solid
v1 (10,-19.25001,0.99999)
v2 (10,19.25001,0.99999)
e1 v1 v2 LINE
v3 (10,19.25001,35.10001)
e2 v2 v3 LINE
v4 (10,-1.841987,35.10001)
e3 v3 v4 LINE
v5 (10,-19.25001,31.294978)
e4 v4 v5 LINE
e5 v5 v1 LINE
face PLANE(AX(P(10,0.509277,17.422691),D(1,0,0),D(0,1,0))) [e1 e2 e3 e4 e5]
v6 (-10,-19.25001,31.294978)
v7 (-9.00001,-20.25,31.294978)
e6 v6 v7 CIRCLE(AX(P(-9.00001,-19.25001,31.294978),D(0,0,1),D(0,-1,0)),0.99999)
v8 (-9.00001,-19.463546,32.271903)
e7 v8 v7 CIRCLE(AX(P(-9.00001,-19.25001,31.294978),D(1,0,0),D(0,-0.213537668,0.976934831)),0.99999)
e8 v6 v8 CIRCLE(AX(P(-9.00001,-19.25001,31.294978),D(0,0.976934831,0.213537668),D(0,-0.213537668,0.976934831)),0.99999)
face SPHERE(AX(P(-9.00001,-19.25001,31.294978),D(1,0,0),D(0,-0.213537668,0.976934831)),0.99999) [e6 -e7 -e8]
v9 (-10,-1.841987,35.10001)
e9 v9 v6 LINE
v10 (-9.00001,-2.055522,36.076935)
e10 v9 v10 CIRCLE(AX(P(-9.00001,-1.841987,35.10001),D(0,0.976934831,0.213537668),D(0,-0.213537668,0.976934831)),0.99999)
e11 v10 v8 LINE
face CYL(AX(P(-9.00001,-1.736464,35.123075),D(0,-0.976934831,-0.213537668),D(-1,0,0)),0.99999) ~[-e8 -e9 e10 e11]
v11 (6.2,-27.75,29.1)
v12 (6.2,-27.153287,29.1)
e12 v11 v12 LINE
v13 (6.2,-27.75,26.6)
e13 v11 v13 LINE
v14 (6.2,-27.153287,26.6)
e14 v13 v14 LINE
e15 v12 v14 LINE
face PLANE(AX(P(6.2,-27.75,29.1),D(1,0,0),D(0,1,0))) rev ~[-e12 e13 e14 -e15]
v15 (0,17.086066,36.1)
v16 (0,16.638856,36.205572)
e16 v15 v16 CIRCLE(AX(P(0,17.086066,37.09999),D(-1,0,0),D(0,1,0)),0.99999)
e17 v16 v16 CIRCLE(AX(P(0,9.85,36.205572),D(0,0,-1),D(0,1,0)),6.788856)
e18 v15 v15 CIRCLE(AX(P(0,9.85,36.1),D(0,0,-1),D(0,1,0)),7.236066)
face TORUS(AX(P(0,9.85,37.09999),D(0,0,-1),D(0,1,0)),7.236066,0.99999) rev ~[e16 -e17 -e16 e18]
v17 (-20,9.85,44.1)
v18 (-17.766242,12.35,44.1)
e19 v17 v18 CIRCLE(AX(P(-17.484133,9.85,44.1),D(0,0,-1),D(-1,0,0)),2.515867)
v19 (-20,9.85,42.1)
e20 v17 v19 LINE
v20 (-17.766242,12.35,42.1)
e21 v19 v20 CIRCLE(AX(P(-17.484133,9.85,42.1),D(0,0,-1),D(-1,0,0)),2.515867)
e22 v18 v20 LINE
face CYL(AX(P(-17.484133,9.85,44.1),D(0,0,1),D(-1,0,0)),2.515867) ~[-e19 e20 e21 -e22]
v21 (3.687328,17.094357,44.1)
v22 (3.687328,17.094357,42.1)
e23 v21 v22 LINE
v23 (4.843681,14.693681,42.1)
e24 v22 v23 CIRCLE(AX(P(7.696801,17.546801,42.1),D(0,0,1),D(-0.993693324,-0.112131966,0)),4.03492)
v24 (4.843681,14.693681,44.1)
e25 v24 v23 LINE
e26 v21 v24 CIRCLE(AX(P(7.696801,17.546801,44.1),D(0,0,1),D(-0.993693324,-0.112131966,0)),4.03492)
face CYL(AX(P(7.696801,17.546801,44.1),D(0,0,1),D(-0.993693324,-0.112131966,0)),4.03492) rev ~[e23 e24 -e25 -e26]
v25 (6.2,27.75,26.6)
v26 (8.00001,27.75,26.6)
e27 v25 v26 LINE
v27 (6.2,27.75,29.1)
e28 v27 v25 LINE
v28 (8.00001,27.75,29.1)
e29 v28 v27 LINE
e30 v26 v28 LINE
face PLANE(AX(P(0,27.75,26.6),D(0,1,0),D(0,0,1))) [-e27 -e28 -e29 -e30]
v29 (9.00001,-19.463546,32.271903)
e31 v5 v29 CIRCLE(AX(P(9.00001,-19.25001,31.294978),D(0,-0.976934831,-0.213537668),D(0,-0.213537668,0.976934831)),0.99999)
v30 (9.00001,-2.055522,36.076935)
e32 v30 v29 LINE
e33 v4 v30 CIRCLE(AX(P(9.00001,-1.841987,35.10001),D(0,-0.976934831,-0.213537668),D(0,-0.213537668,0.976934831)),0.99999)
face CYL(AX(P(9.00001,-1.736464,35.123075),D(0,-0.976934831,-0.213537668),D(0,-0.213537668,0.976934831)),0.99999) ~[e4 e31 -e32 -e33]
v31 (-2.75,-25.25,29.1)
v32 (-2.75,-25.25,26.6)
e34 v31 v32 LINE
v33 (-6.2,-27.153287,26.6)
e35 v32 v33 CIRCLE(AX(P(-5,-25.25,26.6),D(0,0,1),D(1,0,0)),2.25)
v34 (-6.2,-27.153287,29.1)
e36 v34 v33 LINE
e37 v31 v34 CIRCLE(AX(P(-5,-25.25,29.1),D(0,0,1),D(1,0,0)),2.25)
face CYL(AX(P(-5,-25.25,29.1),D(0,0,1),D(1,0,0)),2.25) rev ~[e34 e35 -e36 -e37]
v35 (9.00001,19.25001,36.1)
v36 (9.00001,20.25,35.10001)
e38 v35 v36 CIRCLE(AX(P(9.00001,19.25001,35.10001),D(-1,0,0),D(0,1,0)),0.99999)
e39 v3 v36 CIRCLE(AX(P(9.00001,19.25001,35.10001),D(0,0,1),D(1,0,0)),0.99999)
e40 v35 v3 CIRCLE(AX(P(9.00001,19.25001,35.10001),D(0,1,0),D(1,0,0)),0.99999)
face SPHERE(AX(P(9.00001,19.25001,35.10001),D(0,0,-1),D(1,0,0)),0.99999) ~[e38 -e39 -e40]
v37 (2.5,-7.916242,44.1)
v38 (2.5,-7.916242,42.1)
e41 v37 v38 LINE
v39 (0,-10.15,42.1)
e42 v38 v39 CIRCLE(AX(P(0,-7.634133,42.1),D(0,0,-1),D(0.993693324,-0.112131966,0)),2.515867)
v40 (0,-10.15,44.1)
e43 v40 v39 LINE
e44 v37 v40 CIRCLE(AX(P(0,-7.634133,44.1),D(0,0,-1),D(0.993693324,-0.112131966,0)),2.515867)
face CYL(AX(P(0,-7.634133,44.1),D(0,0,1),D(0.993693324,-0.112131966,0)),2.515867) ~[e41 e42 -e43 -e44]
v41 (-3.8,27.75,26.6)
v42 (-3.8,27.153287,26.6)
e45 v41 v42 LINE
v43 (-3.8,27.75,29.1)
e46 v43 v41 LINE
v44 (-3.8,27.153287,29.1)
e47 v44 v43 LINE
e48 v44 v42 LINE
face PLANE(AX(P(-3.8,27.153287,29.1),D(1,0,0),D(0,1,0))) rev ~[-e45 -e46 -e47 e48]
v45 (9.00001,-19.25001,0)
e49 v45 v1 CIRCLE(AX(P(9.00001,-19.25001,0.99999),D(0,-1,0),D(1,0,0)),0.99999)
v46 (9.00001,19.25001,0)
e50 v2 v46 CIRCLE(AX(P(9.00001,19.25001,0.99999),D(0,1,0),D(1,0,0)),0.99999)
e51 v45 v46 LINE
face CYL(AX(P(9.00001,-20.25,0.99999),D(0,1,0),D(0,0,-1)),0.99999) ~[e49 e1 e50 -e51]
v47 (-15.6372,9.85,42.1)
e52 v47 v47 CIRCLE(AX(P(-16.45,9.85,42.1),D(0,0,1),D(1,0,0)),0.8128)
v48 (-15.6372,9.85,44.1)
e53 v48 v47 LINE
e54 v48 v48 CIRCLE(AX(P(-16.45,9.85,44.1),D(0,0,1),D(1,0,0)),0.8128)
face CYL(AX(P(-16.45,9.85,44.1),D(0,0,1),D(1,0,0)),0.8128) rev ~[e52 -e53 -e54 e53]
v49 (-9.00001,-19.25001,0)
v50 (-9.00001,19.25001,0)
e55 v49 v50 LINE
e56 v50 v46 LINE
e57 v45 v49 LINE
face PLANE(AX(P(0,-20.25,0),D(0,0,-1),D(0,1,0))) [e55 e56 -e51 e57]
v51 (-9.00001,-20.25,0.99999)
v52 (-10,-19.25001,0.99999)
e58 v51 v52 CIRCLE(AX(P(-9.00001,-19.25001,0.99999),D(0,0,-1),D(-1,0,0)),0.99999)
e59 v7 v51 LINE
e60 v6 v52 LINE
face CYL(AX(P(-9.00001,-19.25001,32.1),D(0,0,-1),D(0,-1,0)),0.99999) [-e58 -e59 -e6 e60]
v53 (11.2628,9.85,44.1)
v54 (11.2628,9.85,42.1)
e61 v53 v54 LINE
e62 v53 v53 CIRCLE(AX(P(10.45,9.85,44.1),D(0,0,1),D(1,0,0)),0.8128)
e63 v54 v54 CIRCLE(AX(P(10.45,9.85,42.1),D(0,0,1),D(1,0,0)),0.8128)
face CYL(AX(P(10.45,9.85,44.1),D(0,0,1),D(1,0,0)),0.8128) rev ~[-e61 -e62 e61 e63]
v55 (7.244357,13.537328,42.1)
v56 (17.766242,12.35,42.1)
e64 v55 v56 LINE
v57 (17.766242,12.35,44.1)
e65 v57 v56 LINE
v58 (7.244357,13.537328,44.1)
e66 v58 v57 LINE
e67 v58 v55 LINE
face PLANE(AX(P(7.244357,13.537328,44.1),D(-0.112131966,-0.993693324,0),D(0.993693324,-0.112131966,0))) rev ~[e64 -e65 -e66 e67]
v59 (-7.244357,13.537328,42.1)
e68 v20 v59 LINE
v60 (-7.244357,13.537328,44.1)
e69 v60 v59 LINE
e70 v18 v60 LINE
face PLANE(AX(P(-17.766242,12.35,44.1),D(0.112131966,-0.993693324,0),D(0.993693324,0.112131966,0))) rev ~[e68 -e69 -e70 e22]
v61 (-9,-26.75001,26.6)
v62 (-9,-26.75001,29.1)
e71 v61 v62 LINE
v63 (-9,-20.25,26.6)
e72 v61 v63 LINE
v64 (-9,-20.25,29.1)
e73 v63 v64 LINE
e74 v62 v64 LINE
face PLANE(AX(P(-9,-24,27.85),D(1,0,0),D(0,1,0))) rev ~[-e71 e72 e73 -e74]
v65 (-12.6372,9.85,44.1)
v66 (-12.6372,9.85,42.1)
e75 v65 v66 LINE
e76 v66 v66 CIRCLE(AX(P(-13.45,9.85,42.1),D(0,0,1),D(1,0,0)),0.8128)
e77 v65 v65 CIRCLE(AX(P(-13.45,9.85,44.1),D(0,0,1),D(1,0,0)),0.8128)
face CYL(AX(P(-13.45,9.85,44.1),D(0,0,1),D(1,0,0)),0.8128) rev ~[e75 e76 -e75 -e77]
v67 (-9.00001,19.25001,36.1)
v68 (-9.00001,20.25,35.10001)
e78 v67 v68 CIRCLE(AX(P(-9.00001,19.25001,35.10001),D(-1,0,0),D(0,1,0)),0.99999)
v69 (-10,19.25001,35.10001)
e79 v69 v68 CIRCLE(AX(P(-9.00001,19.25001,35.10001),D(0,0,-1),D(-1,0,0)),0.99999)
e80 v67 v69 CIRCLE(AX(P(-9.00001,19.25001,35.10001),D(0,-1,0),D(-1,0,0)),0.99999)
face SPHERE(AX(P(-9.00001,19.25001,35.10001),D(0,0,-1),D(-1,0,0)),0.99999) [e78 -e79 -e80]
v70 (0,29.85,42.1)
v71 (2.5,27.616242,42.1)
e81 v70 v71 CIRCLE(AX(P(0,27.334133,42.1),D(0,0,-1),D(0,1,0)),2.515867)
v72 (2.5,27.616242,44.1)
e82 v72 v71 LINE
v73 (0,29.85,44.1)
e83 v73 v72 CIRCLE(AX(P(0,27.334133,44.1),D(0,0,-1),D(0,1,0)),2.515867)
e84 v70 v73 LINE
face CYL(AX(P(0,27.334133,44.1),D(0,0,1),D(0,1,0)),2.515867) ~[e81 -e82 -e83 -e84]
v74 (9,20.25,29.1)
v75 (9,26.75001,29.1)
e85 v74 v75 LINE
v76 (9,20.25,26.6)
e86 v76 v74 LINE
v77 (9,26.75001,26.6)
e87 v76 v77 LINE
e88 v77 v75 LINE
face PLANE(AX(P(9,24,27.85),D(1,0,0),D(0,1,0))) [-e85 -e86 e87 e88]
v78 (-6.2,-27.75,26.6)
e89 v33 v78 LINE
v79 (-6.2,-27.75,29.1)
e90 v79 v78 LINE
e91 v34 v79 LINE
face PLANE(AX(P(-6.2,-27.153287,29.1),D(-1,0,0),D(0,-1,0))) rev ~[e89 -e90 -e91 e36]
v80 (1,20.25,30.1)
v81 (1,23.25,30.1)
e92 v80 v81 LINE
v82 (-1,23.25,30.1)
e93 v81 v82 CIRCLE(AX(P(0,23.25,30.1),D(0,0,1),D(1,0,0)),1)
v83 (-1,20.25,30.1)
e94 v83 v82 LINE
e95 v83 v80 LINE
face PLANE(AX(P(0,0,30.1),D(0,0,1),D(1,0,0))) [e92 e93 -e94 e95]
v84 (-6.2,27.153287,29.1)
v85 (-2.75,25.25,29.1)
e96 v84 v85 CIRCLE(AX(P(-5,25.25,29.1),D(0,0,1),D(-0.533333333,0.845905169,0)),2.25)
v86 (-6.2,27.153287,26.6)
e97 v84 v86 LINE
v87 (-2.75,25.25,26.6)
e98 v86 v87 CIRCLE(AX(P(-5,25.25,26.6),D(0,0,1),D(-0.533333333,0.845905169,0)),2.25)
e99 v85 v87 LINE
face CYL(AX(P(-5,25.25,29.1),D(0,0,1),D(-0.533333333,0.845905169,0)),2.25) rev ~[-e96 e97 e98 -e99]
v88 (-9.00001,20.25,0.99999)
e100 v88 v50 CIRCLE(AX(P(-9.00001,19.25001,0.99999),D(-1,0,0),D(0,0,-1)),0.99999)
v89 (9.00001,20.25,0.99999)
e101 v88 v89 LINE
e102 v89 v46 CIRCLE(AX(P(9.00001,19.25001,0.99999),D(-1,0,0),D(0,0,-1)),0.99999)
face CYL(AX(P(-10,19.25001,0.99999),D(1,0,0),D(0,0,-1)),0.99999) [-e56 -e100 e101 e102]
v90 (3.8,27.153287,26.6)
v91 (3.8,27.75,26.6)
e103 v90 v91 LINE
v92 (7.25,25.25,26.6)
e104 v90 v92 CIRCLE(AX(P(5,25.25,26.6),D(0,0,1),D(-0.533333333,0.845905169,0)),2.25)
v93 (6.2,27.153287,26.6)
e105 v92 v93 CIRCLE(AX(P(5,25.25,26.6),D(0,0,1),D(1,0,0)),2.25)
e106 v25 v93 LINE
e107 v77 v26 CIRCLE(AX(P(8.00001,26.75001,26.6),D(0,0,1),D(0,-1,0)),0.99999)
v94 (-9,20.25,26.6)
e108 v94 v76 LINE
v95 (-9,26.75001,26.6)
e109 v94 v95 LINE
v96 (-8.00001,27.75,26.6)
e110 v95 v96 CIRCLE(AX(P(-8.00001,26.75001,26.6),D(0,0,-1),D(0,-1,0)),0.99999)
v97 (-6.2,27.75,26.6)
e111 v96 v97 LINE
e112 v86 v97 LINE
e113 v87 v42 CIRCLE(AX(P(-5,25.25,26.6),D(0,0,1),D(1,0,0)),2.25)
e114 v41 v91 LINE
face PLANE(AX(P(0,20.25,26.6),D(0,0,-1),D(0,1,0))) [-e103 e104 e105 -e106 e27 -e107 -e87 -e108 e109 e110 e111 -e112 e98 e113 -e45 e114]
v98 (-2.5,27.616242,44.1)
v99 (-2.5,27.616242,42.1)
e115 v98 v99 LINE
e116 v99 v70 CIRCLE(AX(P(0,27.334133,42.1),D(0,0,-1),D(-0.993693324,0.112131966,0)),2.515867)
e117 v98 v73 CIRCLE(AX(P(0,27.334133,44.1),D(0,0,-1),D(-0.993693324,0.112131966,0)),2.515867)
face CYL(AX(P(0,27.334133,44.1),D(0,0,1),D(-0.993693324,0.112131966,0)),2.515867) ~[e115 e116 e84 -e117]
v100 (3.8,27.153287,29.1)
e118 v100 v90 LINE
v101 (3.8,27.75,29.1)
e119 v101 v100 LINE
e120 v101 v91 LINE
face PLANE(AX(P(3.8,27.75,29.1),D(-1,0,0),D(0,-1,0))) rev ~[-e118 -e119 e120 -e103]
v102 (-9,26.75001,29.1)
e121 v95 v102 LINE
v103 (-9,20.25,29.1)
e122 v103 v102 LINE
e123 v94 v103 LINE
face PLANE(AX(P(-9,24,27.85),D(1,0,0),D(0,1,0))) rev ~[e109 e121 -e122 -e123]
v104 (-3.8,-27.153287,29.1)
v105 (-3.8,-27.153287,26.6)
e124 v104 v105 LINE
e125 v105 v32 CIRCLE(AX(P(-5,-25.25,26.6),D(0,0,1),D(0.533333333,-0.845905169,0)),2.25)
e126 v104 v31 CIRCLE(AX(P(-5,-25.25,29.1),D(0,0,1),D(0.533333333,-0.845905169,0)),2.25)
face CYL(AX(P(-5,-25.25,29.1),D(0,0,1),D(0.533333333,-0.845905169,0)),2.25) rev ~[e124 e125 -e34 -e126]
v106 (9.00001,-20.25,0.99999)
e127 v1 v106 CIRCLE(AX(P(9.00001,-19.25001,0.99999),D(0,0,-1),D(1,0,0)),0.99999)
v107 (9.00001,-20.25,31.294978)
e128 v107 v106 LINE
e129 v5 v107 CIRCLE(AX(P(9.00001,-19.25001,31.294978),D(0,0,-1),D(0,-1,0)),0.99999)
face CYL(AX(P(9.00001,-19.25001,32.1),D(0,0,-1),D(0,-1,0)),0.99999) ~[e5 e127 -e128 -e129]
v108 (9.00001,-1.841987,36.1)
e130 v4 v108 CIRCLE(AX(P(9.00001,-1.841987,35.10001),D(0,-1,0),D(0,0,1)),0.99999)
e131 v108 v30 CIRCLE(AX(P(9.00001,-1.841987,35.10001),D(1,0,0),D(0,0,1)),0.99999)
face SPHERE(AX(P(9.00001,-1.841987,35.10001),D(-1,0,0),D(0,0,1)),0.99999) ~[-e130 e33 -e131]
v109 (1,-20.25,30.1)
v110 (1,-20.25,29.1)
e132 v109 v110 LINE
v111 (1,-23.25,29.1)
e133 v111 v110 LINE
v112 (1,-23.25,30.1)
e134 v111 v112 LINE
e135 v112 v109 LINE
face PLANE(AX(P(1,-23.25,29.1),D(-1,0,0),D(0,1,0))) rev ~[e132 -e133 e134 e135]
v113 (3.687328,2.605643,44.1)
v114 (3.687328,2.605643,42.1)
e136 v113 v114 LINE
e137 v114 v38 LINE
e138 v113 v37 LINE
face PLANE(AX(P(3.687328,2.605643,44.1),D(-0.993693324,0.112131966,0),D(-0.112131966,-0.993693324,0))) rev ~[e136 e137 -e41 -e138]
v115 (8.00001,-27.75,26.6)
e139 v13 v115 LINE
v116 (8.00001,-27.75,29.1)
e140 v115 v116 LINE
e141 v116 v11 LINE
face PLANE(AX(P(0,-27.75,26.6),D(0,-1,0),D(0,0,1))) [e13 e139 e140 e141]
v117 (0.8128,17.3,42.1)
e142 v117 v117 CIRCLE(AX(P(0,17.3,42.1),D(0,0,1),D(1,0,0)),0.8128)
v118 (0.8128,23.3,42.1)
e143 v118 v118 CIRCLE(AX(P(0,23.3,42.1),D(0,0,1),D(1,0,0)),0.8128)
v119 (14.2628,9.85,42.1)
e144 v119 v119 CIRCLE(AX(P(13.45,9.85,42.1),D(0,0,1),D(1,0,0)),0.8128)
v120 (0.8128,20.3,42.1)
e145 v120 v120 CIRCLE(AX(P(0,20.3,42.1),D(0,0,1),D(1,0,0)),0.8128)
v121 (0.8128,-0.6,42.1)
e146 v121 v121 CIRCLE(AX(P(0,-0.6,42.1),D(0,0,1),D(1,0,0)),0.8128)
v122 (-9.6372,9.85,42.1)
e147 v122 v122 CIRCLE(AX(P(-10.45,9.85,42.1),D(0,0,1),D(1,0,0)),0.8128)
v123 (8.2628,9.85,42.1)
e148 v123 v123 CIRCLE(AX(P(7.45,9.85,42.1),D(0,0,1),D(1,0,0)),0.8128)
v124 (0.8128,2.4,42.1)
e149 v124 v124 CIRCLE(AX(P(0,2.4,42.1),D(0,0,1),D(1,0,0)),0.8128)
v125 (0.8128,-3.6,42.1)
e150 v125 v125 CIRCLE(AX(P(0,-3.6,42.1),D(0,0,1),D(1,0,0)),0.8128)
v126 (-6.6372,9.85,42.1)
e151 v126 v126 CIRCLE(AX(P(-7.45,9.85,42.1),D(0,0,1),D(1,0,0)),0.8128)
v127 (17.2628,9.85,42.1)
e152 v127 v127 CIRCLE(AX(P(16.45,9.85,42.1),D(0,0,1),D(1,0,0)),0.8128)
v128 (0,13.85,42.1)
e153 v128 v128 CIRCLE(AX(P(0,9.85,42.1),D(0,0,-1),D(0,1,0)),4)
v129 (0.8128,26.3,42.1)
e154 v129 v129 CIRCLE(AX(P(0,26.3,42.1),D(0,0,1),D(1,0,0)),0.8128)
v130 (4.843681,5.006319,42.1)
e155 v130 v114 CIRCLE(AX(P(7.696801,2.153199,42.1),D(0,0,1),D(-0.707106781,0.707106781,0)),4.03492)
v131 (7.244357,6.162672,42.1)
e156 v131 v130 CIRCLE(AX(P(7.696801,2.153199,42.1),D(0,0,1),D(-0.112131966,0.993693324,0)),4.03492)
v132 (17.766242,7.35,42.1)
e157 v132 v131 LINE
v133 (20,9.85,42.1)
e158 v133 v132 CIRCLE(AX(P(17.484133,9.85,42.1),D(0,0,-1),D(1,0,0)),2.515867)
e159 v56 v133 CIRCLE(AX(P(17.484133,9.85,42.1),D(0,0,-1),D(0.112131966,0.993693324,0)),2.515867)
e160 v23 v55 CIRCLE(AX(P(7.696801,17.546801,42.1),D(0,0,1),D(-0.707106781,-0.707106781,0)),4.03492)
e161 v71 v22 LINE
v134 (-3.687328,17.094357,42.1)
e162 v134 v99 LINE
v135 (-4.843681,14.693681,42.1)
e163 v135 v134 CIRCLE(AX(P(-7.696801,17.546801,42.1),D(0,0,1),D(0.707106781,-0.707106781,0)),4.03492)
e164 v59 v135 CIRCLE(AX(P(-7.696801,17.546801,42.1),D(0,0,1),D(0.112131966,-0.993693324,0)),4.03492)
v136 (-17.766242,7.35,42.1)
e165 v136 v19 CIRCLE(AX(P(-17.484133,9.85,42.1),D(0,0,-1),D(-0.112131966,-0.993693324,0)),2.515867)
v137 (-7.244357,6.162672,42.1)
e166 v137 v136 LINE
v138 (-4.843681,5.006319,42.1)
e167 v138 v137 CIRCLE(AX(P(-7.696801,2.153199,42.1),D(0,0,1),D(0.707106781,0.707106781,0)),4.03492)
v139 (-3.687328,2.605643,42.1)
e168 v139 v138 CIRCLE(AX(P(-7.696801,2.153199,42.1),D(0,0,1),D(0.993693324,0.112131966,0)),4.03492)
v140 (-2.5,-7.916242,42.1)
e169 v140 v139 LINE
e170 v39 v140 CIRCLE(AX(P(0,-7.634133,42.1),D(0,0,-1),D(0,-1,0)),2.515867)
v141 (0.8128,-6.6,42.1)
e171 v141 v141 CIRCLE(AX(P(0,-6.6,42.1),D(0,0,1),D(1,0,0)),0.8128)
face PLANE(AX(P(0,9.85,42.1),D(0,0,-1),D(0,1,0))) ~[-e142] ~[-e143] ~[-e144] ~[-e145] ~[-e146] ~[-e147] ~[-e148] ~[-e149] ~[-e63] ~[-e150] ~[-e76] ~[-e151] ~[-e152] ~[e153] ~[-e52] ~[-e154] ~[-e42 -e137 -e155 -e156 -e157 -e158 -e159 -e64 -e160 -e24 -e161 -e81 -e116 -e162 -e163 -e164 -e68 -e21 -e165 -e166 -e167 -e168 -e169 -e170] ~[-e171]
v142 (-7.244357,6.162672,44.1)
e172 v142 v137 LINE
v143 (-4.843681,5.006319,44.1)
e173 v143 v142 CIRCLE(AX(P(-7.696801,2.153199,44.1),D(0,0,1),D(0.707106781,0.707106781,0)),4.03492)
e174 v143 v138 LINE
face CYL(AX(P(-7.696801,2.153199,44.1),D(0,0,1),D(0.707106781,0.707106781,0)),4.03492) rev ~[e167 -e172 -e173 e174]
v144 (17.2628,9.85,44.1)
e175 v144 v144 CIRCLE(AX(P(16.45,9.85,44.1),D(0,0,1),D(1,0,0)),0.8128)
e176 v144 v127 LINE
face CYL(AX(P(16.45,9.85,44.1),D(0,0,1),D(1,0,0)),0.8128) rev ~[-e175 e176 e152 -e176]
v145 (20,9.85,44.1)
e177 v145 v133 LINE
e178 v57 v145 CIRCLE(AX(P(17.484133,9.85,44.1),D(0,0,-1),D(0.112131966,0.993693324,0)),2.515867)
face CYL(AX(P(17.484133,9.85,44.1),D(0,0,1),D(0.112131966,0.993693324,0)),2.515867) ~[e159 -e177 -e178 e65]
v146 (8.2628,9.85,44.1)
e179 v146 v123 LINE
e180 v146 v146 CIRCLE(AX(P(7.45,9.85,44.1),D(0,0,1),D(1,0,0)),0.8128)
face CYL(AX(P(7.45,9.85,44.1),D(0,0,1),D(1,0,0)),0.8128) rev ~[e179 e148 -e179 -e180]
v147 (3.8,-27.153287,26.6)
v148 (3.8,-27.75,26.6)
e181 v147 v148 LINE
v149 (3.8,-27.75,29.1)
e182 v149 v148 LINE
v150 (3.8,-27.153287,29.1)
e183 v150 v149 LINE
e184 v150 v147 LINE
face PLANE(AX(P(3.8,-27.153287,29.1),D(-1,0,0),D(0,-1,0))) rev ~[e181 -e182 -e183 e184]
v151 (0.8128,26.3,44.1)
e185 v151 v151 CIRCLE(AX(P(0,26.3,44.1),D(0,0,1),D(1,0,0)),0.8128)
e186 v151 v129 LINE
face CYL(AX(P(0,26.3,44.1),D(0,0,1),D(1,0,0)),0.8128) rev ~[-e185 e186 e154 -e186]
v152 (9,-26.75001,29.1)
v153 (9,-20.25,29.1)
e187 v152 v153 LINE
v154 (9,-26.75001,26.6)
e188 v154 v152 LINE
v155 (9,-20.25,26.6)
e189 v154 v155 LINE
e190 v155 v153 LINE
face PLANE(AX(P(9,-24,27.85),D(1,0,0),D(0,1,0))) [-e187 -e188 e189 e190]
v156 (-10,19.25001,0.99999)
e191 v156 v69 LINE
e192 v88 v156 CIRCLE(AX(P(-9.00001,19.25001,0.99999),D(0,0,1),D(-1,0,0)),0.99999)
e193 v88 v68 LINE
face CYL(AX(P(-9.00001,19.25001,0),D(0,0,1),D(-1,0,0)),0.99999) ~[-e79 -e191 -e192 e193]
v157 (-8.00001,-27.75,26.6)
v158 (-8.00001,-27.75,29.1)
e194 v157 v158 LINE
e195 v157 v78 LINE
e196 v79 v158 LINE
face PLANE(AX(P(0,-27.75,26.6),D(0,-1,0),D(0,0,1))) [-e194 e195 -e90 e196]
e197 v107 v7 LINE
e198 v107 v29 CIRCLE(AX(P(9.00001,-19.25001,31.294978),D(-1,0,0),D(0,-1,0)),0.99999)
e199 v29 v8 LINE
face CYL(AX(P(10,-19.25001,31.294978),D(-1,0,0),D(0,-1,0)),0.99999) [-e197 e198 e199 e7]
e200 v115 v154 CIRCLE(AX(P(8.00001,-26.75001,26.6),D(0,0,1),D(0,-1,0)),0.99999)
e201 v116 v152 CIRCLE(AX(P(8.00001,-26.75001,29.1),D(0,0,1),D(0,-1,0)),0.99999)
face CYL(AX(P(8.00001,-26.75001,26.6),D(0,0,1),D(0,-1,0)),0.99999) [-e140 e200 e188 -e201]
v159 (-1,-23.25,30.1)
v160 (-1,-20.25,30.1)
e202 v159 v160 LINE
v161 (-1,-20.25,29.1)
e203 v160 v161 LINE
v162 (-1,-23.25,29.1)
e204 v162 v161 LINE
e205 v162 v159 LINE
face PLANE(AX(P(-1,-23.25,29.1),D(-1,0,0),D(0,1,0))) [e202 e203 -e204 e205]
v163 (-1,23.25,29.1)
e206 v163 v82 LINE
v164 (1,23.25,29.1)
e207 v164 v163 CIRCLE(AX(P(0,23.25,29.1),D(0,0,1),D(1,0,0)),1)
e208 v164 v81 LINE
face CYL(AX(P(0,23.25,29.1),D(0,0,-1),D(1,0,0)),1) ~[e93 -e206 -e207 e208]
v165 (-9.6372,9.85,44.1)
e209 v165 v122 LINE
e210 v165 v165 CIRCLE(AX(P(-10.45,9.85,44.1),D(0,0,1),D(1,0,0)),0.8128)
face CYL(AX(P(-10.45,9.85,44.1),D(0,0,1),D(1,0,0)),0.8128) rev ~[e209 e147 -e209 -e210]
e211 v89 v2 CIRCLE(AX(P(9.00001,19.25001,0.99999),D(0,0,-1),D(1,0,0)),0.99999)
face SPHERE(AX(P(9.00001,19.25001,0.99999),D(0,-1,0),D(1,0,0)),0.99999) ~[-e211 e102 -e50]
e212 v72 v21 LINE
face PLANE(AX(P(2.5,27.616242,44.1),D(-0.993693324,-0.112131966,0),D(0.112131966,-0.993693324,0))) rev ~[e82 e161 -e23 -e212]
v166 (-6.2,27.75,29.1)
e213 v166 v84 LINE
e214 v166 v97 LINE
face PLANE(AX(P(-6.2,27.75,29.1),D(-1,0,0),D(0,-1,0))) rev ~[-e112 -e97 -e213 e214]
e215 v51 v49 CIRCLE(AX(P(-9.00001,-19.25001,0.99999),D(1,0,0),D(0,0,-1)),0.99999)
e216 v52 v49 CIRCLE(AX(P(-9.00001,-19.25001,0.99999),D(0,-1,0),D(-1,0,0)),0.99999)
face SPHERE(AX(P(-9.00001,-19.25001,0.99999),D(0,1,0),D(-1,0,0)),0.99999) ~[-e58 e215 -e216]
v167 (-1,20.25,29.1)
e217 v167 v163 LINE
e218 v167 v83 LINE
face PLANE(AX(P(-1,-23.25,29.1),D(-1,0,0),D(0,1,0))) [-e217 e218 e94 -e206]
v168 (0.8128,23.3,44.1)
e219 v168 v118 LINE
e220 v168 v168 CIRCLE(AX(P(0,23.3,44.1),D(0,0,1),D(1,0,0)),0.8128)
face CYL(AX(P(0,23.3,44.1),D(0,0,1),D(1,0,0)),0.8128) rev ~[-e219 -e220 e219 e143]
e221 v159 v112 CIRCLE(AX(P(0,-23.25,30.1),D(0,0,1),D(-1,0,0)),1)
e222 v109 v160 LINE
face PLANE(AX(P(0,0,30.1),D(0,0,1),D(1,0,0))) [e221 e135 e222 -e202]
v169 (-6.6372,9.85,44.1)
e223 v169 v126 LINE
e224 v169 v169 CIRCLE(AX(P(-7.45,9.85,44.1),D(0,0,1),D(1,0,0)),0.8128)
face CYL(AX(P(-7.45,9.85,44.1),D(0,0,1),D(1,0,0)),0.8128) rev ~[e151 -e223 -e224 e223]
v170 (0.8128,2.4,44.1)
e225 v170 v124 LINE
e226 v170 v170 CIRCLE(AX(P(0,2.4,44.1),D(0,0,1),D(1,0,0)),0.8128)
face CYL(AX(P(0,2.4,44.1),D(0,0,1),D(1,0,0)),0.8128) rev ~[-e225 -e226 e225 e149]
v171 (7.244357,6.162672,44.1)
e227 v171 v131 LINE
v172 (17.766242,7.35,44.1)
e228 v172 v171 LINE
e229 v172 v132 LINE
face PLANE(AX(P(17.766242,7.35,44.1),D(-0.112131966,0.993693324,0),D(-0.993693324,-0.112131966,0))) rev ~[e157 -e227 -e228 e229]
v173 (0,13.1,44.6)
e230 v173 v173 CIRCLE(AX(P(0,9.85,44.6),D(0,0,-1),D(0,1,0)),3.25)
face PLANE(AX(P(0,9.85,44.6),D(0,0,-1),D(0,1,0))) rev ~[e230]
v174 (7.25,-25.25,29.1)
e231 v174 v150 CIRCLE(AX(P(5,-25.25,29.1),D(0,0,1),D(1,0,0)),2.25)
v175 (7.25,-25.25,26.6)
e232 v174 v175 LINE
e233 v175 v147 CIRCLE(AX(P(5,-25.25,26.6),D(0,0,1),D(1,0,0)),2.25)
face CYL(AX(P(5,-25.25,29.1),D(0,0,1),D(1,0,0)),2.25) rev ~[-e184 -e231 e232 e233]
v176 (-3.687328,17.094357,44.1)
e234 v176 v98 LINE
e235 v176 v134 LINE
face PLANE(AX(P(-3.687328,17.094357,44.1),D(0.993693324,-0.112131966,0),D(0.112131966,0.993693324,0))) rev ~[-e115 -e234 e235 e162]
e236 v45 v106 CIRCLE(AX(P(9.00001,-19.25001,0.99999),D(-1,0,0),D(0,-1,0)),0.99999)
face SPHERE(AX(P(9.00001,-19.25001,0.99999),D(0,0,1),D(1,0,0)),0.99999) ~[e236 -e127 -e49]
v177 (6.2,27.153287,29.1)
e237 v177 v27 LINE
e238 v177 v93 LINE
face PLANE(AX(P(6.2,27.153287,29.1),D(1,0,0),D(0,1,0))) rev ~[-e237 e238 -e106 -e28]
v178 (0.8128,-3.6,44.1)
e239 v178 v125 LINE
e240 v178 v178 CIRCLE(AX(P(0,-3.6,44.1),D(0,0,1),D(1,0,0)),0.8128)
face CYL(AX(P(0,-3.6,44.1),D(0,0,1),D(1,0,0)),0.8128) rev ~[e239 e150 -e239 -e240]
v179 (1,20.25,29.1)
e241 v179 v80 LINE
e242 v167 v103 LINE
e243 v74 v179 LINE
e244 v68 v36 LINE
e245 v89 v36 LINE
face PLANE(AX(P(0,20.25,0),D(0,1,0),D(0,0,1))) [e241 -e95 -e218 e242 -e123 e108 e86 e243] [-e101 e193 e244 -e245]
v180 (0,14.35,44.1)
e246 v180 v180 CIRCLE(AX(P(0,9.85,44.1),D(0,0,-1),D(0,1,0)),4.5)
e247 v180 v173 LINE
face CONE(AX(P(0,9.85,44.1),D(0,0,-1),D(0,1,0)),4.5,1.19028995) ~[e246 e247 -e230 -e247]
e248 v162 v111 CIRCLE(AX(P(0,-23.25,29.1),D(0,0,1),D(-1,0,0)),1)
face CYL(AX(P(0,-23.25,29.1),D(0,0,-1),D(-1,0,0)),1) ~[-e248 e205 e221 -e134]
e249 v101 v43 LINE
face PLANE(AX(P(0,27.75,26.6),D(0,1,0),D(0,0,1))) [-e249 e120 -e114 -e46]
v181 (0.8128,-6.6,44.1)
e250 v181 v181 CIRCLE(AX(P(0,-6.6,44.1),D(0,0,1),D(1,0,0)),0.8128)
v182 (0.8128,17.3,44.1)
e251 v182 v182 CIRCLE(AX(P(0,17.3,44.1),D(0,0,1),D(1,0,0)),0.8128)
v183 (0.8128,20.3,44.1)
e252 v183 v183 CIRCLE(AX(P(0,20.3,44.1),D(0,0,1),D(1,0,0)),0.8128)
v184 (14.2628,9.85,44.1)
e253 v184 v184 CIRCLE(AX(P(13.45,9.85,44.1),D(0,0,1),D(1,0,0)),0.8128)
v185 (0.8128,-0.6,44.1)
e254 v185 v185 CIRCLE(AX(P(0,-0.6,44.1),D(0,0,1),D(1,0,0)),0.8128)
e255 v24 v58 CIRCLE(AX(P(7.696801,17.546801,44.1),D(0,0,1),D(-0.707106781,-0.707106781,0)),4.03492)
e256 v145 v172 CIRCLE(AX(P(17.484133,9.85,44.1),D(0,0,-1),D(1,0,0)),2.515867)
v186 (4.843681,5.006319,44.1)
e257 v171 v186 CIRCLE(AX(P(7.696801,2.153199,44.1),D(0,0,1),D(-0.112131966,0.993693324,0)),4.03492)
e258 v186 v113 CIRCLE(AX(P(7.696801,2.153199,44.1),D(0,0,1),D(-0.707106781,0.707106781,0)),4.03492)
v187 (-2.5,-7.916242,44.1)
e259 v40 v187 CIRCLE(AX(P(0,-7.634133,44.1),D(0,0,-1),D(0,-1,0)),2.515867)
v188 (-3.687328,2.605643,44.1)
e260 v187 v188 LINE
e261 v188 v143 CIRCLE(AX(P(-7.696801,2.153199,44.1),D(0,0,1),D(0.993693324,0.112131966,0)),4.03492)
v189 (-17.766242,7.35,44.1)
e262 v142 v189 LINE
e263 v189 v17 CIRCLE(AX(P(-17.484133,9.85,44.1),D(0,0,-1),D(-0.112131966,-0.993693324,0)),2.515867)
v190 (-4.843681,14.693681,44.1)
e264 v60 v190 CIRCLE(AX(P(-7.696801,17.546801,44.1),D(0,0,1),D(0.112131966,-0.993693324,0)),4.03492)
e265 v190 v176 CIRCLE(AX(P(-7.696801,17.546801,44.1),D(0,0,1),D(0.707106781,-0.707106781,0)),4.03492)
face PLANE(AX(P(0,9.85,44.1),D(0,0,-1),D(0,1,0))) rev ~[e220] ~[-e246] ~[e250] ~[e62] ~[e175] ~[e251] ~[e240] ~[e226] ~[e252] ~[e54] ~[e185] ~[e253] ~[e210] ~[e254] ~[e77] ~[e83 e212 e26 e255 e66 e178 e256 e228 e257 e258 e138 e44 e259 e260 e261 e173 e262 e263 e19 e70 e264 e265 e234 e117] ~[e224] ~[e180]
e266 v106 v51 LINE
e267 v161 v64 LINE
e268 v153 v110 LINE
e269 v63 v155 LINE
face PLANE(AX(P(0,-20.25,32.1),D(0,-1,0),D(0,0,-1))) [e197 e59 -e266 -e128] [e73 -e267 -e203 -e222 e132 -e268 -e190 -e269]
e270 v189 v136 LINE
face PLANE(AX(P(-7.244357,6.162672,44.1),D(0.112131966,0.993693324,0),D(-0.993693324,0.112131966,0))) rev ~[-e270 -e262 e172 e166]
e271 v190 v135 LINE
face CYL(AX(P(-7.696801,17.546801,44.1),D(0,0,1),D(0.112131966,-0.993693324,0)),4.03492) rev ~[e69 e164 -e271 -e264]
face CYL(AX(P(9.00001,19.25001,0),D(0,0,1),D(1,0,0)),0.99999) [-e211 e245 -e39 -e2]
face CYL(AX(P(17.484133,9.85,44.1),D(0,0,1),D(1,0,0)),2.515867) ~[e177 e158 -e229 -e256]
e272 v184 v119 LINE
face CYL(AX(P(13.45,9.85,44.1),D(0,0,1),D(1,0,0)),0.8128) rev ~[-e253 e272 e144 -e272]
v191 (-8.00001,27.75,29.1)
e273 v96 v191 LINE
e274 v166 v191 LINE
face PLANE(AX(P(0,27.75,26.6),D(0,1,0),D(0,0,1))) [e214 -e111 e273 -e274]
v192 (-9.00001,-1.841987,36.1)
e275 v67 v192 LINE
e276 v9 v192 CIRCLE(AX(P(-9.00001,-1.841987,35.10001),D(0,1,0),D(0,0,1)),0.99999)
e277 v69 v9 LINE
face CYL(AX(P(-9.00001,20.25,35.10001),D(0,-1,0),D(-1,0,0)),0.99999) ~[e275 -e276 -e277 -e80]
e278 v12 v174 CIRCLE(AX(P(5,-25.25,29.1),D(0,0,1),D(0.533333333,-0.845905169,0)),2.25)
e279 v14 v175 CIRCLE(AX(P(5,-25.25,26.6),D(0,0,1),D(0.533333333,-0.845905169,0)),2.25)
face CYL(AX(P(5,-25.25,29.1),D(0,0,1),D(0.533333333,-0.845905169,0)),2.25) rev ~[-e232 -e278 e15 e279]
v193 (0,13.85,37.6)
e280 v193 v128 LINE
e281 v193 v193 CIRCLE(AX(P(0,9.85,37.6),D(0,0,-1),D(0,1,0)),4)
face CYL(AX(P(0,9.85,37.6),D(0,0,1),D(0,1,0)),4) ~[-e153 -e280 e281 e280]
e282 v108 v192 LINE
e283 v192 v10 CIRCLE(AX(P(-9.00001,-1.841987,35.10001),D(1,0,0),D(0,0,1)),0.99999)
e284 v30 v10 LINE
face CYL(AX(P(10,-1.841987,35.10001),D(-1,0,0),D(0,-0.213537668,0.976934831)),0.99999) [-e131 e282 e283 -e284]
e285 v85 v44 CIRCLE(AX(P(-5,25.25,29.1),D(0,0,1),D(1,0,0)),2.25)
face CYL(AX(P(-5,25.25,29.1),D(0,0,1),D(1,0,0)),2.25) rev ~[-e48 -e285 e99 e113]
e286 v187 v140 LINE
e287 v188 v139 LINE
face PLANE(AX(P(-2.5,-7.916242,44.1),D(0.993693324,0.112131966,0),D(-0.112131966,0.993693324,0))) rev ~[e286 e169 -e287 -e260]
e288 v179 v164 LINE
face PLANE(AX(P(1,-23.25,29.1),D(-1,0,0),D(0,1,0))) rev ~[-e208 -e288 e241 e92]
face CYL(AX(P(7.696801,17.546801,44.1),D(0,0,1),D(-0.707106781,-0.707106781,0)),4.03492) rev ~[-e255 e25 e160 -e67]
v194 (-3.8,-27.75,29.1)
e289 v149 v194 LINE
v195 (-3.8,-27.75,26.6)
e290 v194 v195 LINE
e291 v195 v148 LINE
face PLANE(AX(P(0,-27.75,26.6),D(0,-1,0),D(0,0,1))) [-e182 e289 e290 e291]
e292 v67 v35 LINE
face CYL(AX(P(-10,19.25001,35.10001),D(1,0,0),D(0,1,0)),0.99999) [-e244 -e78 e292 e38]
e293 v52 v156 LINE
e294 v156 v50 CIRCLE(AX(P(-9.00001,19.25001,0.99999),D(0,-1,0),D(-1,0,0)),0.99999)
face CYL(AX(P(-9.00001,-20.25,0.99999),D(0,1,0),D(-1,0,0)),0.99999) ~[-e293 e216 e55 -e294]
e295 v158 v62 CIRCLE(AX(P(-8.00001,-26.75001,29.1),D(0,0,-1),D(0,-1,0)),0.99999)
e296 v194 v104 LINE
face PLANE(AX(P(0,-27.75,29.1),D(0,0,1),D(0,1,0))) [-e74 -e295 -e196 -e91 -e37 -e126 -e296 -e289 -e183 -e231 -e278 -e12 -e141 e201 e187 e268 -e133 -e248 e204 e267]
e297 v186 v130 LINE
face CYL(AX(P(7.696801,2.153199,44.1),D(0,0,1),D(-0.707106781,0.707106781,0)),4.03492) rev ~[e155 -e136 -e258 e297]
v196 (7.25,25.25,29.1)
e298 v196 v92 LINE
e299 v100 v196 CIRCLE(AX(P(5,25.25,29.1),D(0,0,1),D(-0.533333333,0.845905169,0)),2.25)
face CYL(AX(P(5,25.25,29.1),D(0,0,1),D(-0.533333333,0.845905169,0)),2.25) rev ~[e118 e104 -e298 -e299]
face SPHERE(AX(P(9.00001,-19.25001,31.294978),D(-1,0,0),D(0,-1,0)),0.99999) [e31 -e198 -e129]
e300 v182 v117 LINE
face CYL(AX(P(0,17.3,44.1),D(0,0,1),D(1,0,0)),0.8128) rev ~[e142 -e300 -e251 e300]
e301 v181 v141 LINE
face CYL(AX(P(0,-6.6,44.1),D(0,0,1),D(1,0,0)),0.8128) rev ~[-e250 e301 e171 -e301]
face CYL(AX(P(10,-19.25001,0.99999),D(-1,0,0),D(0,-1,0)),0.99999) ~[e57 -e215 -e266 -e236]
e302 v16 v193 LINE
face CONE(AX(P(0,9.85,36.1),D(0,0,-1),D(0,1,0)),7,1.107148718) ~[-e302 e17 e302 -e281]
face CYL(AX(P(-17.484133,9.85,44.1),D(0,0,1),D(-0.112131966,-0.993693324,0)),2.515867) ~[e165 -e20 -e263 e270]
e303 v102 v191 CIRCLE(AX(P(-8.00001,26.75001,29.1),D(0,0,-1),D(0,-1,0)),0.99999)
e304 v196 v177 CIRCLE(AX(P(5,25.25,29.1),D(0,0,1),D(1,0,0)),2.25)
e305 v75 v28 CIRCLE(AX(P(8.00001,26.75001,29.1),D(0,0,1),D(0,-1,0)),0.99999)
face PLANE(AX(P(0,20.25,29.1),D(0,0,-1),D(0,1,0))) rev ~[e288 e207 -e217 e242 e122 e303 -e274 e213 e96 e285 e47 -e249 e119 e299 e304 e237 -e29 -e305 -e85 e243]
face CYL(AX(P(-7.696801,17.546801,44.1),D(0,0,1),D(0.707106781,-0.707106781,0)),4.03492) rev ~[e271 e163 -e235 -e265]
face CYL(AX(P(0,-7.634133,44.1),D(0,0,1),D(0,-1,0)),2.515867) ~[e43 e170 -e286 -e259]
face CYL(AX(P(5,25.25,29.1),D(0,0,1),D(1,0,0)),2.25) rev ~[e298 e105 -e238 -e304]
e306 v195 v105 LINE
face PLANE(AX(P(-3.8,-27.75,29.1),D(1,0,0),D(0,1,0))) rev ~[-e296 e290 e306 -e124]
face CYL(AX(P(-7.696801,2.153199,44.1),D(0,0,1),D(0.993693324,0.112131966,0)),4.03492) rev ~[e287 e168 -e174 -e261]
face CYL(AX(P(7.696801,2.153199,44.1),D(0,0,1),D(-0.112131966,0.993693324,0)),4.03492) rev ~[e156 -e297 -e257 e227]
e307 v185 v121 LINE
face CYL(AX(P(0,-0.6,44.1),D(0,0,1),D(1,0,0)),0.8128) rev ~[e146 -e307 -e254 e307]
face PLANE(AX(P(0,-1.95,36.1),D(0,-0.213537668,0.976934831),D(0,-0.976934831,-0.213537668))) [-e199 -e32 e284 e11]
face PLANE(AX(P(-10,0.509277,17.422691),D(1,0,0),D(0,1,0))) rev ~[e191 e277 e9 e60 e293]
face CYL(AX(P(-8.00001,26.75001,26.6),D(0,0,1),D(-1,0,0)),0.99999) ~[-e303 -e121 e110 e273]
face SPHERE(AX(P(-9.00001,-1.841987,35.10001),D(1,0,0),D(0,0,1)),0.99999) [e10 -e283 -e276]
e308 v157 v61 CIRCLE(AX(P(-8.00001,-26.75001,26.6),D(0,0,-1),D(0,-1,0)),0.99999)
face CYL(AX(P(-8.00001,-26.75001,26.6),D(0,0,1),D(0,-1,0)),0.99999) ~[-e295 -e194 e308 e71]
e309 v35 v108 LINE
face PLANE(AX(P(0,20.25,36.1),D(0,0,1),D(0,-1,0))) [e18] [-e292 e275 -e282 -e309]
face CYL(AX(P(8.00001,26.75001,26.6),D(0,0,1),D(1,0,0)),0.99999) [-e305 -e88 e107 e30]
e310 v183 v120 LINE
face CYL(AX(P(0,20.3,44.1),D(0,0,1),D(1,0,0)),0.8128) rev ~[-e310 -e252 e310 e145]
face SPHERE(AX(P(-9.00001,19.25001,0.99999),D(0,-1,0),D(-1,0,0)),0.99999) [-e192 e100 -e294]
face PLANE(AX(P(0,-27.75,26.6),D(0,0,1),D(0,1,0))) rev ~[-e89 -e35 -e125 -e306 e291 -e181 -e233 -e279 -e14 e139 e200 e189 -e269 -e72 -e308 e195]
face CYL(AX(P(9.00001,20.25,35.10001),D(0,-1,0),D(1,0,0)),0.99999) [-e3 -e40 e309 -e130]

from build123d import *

# Parameters (mm, degrees)
F1_DEPTH  = 10
F0_W      = 7.5
F0_H      = 2.5
F2_DEPTH  = 9
F4_DEPTH  = 25
F5_W      = 2
F5_H      = 46.5
F6_DEPTH  = 1
F9_R      = 0.8128
F10_DEPTH = 2
F11_R     = 26.294756744
F12_DEPTH = 2
F13_R     = 0.99999


# Not quite as in the source:
# - a fillet or chamfer is up to 0.001 mm smaller than in the source, because OpenCascade refuses the exact size


with BuildPart() as f1:
    # F0 (on Right) → F1 (new body, symmetric)
    with BuildSketch(Plane.YZ):
        Polygon((-20.25, 26.6), (-20.25, 0), (20.25, 0), (20.25, 26.6), (20.25, 29.1), (20.25, 36.1), (-1.95, 36.1), (-20.25, 32.1), (-20.25, 29.1), align=None)
    extrude(amount=F1_DEPTH, both=True)

    # F0 (on Right) → F2 (join, symmetric)
    with BuildSketch(Plane.YZ):
        with Locations((-24, 27.85)):
            Rectangle(F0_W, F0_H)
        with Locations((24, 27.85)):
            Rectangle(F0_W, F0_H)
    extrude(amount=F2_DEPTH, both=True)

    # F3 (on face) → F4 (cut)
    with BuildSketch(Plane.XY.offset(29.1)):
        with BuildLine():
            ThreePointArc((-3.8, -27.1532866311), (-3.0299111695, -26.336853256), (-2.75, -25.25))
            ThreePointArc((-2.75, -25.25), (-6.086853256, -23.2799111695), (-6.2, -27.1532866311))
            ThreePointArc((-6.2, -27.1532866311), (-5, -27.5), (-3.8, -27.1532866311))
        make_face()
        with BuildLine():
            ThreePointArc((-3.8, -27.1532866311), (-5, -27.5), (-6.2, -27.1532866311))
            Line((-6.2, -27.1532866311), (-6.2, -27.75))
            Line((-6.2, -27.75), (-3.8, -27.75))
            Line((-3.8, -27.75), (-3.8, -27.1532866311))
        make_face()
        with BuildLine():
            Line((-3.8, 27.75), (-6.2, 27.75))
            Line((-6.2, 27.75), (-6.2, 27.1532866311))
            ThreePointArc((-6.2, 27.1532866311), (-5, 27.5), (-3.8, 27.1532866311))
            Line((-3.8, 27.1532866311), (-3.8, 27.75))
        make_face()
        with BuildLine():
            ThreePointArc((-3.8, 27.1532866311), (-5, 27.5), (-6.2, 27.1532866311))
            ThreePointArc((-6.2, 27.1532866311), (-6.086853256, 23.2799111695), (-2.75, 25.25))
            ThreePointArc((-2.75, 25.25), (-3.0299111695, 26.336853256), (-3.8, 27.1532866311))
        make_face()
        with BuildLine():
            Line((3.8, -27.1532866311), (3.8, -27.75))
            Line((3.8, -27.75), (6.2, -27.75))
            Line((6.2, -27.75), (6.2, -27.1532866311))
            ThreePointArc((6.2, -27.1532866311), (5, -27.5), (3.8, -27.1532866311))
        make_face()
        with BuildLine():
            ThreePointArc((7.25, -25.25), (3.913146744, -23.2799111695), (3.8, -27.1532866311))
            ThreePointArc((3.8, -27.1532866311), (5, -27.5), (6.2, -27.1532866311))
            ThreePointArc((6.2, -27.1532866311), (6.9700888305, -26.336853256), (7.25, -25.25))
        make_face()
        with BuildLine():
            Line((6.2, 27.75), (3.8, 27.75))
            Line((3.8, 27.75), (3.8, 27.1532866311))
            ThreePointArc((3.8, 27.1532866311), (5, 27.5), (6.2, 27.1532866311))
            Line((6.2, 27.1532866311), (6.2, 27.75))
        make_face()
        with BuildLine():
            ThreePointArc((6.2, 27.1532866311), (5, 27.5), (3.8, 27.1532866311))
            ThreePointArc((3.8, 27.1532866311), (3.913146744, 23.2799111695), (7.25, 25.25))
            ThreePointArc((7.25, 25.25), (6.9700888305, 26.336853256), (6.2, 27.1532866311))
        make_face()
    extrude(amount=-F4_DEPTH, mode=Mode.SUBTRACT)

    # F5 (on face) → F6 (join)
    with BuildSketch(Plane.XY.offset(29.1)):
        Rectangle(F5_W, F5_H)
        with BuildLine():
            Line((-1, 23.25), (1, 23.25))
            ThreePointArc((1, 23.25), (0, 24.25), (-1, 23.25))
        make_face()
        with BuildLine():
            ThreePointArc((-1, -23.25), (0, -24.25), (1, -23.25))
            Line((1, -23.25), (-1, -23.25))
        make_face()
    extrude(amount=F6_DEPTH)

    # F7 (on Right) → F8 (revolve)
    with BuildSketch(Plane.YZ):
        Polygon((9.85, 36.1), (16.85, 36.1), (13.85, 37.6), (13.85, 42.1), (29.85, 42.1), (29.85, 44.1), (14.35, 44.1), (13.1, 44.6), (9.85, 44.6), align=None)
    revolve(axis=Axis((0, 9.85, 38.956922479), (0, 0, -1)))

    # F9 (on face) → F10 (cut, through all)
    with BuildSketch(Plane.XY.offset(44.1)):
        with Locations((0, 17.3)):
            Circle(F9_R)
        with Locations((0, 20.3)):
            Circle(F9_R)
        with Locations((0, 23.3)):
            Circle(F9_R)
        with Locations((0, 26.3)):
            Circle(F9_R)
        with Locations((-16.45, 9.85)):
            Circle(F9_R)
        with Locations((-13.45, 9.85)):
            Circle(F9_R)
        with Locations((-10.45, 9.85)):
            Circle(F9_R)
        with Locations((-7.45, 9.85)):
            Circle(F9_R)
        with Locations((0, -6.6)):
            Circle(F9_R)
        with Locations((0, -3.6)):
            Circle(F9_R)
        with Locations((0, -0.6)):
            Circle(F9_R)
        with Locations((0, 2.4)):
            Circle(F9_R)
        with Locations((16.45, 9.85)):
            Circle(F9_R)
        with Locations((13.45, 9.85)):
            Circle(F9_R)
        with Locations((10.45, 9.85)):
            Circle(F9_R)
        with Locations((7.45, 9.85)):
            Circle(F9_R)
    extrude(amount=-F10_DEPTH, mode=Mode.SUBTRACT)

    # F11 (on face) → F12 (cut, through all)
    with BuildSketch(Plane.XY.offset(44.1)):
        with Locations((0, 9.85)):
            Circle(F11_R)
        with BuildLine():
            ThreePointArc((-4.8436814511, 14.6936814511), (-4.0616110554, 15.7958081166), (-3.6873277698, 17.0943570425))
            Line((-3.6873277698, 17.0943570425), (-2.5, 27.6162423281))
            ThreePointArc((-2.5, 27.6162423281), (-1.6762811024, 29.2102108544), (0, 29.85))
            ThreePointArc((0, 29.85), (1.6762811024, 29.2102108544), (2.5, 27.6162423281))
            Line((2.5, 27.6162423281), (3.6873277698, 17.0943570425))
            ThreePointArc((3.6873277698, 17.0943570425), (4.0616110554, 15.7958081166), (4.8436814511, 14.6936814511))
            ThreePointArc((4.8436814511, 14.6936814511), (5.9458081166, 13.9116110554), (7.2443570425, 13.5373277698))
            Line((7.2443570425, 13.5373277698), (17.7662423281, 12.35))
            ThreePointArc((17.7662423281, 12.35), (19.3602108544, 11.5262811024), (20, 9.85))
            ThreePointArc((20, 9.85), (19.3602108544, 8.1737188976), (17.7662423281, 7.35))
            Line((17.7662423281, 7.35), (7.2443570425, 6.1626722302))
            ThreePointArc((7.2443570425, 6.1626722302), (5.9458081166, 5.7883889446), (4.8436814511, 5.0063185489))
            ThreePointArc((4.8436814511, 5.0063185489), (4.0616110554, 3.9041918834), (3.6873277698, 2.6056429575))
            Line((3.6873277698, 2.6056429575), (2.5, -7.9162423281))
            ThreePointArc((2.5, -7.9162423281), (1.6762811024, -9.5102108544), (0, -10.15))
            ThreePointArc((0, -10.15), (-1.6762811024, -9.5102108544), (-2.5, -7.9162423281))
            Line((-2.5, -7.9162423281), (-3.6873277698, 2.6056429575))
            ThreePointArc((-3.6873277698, 2.6056429575), (-4.0616110554, 3.9041918834), (-4.8436814511, 5.0063185489))
            ThreePointArc((-4.8436814511, 5.0063185489), (-5.9458081166, 5.7883889446), (-7.2443570425, 6.1626722302))
            Line((-7.2443570425, 6.1626722302), (-17.7662423281, 7.35))
            ThreePointArc((-17.7662423281, 7.35), (-19.3602108544, 8.1737188976), (-20, 9.85))
            ThreePointArc((-20, 9.85), (-19.3602108544, 11.5262811024), (-17.7662423281, 12.35))
            Line((-17.7662423281, 12.35), (-7.2443570425, 13.5373277698))
            ThreePointArc((-7.2443570425, 13.5373277698), (-5.9458081166, 13.9116110554), (-4.8436814511, 14.6936814511))
        make_face(mode=Mode.SUBTRACT)
    extrude(amount=-F12_DEPTH, mode=Mode.SUBTRACT)

    # F13 (radius 1 in the source; OpenCascade refuses exactly that, so slightly less here)
    f13_edges = [f1.edges().sort_by_distance(p)[0] for p in [
        (10, -20.25, 16.05),
        (10, 0, 0),
        (10, 20.25, 18.05),
        (10, 9.15, 36.1),
        (10, -11.1, 34.1),
        (-10, 0, 0),
        (-10, 20.25, 18.05),
        (-10, 9.15, 36.1),
        (-10, -11.1, 34.1),
        (-10, -20.25, 16.05),
        (0, -20.25, 0),
        (0, 20.25, 0),
        (0, -1.95, 36.1),
        (0, -20.25, 32.1),
        (0, 20.25, 36.1),
        (0, 2.85, 36.1),
        (9, -27.75, 27.85),
        (-9, -27.75, 27.85),
        (9, 27.75, 27.85),
        (-9, 27.75, 27.85),
    ]]
    fillet(f13_edges, radius=F13_R)


solid = f1.part
